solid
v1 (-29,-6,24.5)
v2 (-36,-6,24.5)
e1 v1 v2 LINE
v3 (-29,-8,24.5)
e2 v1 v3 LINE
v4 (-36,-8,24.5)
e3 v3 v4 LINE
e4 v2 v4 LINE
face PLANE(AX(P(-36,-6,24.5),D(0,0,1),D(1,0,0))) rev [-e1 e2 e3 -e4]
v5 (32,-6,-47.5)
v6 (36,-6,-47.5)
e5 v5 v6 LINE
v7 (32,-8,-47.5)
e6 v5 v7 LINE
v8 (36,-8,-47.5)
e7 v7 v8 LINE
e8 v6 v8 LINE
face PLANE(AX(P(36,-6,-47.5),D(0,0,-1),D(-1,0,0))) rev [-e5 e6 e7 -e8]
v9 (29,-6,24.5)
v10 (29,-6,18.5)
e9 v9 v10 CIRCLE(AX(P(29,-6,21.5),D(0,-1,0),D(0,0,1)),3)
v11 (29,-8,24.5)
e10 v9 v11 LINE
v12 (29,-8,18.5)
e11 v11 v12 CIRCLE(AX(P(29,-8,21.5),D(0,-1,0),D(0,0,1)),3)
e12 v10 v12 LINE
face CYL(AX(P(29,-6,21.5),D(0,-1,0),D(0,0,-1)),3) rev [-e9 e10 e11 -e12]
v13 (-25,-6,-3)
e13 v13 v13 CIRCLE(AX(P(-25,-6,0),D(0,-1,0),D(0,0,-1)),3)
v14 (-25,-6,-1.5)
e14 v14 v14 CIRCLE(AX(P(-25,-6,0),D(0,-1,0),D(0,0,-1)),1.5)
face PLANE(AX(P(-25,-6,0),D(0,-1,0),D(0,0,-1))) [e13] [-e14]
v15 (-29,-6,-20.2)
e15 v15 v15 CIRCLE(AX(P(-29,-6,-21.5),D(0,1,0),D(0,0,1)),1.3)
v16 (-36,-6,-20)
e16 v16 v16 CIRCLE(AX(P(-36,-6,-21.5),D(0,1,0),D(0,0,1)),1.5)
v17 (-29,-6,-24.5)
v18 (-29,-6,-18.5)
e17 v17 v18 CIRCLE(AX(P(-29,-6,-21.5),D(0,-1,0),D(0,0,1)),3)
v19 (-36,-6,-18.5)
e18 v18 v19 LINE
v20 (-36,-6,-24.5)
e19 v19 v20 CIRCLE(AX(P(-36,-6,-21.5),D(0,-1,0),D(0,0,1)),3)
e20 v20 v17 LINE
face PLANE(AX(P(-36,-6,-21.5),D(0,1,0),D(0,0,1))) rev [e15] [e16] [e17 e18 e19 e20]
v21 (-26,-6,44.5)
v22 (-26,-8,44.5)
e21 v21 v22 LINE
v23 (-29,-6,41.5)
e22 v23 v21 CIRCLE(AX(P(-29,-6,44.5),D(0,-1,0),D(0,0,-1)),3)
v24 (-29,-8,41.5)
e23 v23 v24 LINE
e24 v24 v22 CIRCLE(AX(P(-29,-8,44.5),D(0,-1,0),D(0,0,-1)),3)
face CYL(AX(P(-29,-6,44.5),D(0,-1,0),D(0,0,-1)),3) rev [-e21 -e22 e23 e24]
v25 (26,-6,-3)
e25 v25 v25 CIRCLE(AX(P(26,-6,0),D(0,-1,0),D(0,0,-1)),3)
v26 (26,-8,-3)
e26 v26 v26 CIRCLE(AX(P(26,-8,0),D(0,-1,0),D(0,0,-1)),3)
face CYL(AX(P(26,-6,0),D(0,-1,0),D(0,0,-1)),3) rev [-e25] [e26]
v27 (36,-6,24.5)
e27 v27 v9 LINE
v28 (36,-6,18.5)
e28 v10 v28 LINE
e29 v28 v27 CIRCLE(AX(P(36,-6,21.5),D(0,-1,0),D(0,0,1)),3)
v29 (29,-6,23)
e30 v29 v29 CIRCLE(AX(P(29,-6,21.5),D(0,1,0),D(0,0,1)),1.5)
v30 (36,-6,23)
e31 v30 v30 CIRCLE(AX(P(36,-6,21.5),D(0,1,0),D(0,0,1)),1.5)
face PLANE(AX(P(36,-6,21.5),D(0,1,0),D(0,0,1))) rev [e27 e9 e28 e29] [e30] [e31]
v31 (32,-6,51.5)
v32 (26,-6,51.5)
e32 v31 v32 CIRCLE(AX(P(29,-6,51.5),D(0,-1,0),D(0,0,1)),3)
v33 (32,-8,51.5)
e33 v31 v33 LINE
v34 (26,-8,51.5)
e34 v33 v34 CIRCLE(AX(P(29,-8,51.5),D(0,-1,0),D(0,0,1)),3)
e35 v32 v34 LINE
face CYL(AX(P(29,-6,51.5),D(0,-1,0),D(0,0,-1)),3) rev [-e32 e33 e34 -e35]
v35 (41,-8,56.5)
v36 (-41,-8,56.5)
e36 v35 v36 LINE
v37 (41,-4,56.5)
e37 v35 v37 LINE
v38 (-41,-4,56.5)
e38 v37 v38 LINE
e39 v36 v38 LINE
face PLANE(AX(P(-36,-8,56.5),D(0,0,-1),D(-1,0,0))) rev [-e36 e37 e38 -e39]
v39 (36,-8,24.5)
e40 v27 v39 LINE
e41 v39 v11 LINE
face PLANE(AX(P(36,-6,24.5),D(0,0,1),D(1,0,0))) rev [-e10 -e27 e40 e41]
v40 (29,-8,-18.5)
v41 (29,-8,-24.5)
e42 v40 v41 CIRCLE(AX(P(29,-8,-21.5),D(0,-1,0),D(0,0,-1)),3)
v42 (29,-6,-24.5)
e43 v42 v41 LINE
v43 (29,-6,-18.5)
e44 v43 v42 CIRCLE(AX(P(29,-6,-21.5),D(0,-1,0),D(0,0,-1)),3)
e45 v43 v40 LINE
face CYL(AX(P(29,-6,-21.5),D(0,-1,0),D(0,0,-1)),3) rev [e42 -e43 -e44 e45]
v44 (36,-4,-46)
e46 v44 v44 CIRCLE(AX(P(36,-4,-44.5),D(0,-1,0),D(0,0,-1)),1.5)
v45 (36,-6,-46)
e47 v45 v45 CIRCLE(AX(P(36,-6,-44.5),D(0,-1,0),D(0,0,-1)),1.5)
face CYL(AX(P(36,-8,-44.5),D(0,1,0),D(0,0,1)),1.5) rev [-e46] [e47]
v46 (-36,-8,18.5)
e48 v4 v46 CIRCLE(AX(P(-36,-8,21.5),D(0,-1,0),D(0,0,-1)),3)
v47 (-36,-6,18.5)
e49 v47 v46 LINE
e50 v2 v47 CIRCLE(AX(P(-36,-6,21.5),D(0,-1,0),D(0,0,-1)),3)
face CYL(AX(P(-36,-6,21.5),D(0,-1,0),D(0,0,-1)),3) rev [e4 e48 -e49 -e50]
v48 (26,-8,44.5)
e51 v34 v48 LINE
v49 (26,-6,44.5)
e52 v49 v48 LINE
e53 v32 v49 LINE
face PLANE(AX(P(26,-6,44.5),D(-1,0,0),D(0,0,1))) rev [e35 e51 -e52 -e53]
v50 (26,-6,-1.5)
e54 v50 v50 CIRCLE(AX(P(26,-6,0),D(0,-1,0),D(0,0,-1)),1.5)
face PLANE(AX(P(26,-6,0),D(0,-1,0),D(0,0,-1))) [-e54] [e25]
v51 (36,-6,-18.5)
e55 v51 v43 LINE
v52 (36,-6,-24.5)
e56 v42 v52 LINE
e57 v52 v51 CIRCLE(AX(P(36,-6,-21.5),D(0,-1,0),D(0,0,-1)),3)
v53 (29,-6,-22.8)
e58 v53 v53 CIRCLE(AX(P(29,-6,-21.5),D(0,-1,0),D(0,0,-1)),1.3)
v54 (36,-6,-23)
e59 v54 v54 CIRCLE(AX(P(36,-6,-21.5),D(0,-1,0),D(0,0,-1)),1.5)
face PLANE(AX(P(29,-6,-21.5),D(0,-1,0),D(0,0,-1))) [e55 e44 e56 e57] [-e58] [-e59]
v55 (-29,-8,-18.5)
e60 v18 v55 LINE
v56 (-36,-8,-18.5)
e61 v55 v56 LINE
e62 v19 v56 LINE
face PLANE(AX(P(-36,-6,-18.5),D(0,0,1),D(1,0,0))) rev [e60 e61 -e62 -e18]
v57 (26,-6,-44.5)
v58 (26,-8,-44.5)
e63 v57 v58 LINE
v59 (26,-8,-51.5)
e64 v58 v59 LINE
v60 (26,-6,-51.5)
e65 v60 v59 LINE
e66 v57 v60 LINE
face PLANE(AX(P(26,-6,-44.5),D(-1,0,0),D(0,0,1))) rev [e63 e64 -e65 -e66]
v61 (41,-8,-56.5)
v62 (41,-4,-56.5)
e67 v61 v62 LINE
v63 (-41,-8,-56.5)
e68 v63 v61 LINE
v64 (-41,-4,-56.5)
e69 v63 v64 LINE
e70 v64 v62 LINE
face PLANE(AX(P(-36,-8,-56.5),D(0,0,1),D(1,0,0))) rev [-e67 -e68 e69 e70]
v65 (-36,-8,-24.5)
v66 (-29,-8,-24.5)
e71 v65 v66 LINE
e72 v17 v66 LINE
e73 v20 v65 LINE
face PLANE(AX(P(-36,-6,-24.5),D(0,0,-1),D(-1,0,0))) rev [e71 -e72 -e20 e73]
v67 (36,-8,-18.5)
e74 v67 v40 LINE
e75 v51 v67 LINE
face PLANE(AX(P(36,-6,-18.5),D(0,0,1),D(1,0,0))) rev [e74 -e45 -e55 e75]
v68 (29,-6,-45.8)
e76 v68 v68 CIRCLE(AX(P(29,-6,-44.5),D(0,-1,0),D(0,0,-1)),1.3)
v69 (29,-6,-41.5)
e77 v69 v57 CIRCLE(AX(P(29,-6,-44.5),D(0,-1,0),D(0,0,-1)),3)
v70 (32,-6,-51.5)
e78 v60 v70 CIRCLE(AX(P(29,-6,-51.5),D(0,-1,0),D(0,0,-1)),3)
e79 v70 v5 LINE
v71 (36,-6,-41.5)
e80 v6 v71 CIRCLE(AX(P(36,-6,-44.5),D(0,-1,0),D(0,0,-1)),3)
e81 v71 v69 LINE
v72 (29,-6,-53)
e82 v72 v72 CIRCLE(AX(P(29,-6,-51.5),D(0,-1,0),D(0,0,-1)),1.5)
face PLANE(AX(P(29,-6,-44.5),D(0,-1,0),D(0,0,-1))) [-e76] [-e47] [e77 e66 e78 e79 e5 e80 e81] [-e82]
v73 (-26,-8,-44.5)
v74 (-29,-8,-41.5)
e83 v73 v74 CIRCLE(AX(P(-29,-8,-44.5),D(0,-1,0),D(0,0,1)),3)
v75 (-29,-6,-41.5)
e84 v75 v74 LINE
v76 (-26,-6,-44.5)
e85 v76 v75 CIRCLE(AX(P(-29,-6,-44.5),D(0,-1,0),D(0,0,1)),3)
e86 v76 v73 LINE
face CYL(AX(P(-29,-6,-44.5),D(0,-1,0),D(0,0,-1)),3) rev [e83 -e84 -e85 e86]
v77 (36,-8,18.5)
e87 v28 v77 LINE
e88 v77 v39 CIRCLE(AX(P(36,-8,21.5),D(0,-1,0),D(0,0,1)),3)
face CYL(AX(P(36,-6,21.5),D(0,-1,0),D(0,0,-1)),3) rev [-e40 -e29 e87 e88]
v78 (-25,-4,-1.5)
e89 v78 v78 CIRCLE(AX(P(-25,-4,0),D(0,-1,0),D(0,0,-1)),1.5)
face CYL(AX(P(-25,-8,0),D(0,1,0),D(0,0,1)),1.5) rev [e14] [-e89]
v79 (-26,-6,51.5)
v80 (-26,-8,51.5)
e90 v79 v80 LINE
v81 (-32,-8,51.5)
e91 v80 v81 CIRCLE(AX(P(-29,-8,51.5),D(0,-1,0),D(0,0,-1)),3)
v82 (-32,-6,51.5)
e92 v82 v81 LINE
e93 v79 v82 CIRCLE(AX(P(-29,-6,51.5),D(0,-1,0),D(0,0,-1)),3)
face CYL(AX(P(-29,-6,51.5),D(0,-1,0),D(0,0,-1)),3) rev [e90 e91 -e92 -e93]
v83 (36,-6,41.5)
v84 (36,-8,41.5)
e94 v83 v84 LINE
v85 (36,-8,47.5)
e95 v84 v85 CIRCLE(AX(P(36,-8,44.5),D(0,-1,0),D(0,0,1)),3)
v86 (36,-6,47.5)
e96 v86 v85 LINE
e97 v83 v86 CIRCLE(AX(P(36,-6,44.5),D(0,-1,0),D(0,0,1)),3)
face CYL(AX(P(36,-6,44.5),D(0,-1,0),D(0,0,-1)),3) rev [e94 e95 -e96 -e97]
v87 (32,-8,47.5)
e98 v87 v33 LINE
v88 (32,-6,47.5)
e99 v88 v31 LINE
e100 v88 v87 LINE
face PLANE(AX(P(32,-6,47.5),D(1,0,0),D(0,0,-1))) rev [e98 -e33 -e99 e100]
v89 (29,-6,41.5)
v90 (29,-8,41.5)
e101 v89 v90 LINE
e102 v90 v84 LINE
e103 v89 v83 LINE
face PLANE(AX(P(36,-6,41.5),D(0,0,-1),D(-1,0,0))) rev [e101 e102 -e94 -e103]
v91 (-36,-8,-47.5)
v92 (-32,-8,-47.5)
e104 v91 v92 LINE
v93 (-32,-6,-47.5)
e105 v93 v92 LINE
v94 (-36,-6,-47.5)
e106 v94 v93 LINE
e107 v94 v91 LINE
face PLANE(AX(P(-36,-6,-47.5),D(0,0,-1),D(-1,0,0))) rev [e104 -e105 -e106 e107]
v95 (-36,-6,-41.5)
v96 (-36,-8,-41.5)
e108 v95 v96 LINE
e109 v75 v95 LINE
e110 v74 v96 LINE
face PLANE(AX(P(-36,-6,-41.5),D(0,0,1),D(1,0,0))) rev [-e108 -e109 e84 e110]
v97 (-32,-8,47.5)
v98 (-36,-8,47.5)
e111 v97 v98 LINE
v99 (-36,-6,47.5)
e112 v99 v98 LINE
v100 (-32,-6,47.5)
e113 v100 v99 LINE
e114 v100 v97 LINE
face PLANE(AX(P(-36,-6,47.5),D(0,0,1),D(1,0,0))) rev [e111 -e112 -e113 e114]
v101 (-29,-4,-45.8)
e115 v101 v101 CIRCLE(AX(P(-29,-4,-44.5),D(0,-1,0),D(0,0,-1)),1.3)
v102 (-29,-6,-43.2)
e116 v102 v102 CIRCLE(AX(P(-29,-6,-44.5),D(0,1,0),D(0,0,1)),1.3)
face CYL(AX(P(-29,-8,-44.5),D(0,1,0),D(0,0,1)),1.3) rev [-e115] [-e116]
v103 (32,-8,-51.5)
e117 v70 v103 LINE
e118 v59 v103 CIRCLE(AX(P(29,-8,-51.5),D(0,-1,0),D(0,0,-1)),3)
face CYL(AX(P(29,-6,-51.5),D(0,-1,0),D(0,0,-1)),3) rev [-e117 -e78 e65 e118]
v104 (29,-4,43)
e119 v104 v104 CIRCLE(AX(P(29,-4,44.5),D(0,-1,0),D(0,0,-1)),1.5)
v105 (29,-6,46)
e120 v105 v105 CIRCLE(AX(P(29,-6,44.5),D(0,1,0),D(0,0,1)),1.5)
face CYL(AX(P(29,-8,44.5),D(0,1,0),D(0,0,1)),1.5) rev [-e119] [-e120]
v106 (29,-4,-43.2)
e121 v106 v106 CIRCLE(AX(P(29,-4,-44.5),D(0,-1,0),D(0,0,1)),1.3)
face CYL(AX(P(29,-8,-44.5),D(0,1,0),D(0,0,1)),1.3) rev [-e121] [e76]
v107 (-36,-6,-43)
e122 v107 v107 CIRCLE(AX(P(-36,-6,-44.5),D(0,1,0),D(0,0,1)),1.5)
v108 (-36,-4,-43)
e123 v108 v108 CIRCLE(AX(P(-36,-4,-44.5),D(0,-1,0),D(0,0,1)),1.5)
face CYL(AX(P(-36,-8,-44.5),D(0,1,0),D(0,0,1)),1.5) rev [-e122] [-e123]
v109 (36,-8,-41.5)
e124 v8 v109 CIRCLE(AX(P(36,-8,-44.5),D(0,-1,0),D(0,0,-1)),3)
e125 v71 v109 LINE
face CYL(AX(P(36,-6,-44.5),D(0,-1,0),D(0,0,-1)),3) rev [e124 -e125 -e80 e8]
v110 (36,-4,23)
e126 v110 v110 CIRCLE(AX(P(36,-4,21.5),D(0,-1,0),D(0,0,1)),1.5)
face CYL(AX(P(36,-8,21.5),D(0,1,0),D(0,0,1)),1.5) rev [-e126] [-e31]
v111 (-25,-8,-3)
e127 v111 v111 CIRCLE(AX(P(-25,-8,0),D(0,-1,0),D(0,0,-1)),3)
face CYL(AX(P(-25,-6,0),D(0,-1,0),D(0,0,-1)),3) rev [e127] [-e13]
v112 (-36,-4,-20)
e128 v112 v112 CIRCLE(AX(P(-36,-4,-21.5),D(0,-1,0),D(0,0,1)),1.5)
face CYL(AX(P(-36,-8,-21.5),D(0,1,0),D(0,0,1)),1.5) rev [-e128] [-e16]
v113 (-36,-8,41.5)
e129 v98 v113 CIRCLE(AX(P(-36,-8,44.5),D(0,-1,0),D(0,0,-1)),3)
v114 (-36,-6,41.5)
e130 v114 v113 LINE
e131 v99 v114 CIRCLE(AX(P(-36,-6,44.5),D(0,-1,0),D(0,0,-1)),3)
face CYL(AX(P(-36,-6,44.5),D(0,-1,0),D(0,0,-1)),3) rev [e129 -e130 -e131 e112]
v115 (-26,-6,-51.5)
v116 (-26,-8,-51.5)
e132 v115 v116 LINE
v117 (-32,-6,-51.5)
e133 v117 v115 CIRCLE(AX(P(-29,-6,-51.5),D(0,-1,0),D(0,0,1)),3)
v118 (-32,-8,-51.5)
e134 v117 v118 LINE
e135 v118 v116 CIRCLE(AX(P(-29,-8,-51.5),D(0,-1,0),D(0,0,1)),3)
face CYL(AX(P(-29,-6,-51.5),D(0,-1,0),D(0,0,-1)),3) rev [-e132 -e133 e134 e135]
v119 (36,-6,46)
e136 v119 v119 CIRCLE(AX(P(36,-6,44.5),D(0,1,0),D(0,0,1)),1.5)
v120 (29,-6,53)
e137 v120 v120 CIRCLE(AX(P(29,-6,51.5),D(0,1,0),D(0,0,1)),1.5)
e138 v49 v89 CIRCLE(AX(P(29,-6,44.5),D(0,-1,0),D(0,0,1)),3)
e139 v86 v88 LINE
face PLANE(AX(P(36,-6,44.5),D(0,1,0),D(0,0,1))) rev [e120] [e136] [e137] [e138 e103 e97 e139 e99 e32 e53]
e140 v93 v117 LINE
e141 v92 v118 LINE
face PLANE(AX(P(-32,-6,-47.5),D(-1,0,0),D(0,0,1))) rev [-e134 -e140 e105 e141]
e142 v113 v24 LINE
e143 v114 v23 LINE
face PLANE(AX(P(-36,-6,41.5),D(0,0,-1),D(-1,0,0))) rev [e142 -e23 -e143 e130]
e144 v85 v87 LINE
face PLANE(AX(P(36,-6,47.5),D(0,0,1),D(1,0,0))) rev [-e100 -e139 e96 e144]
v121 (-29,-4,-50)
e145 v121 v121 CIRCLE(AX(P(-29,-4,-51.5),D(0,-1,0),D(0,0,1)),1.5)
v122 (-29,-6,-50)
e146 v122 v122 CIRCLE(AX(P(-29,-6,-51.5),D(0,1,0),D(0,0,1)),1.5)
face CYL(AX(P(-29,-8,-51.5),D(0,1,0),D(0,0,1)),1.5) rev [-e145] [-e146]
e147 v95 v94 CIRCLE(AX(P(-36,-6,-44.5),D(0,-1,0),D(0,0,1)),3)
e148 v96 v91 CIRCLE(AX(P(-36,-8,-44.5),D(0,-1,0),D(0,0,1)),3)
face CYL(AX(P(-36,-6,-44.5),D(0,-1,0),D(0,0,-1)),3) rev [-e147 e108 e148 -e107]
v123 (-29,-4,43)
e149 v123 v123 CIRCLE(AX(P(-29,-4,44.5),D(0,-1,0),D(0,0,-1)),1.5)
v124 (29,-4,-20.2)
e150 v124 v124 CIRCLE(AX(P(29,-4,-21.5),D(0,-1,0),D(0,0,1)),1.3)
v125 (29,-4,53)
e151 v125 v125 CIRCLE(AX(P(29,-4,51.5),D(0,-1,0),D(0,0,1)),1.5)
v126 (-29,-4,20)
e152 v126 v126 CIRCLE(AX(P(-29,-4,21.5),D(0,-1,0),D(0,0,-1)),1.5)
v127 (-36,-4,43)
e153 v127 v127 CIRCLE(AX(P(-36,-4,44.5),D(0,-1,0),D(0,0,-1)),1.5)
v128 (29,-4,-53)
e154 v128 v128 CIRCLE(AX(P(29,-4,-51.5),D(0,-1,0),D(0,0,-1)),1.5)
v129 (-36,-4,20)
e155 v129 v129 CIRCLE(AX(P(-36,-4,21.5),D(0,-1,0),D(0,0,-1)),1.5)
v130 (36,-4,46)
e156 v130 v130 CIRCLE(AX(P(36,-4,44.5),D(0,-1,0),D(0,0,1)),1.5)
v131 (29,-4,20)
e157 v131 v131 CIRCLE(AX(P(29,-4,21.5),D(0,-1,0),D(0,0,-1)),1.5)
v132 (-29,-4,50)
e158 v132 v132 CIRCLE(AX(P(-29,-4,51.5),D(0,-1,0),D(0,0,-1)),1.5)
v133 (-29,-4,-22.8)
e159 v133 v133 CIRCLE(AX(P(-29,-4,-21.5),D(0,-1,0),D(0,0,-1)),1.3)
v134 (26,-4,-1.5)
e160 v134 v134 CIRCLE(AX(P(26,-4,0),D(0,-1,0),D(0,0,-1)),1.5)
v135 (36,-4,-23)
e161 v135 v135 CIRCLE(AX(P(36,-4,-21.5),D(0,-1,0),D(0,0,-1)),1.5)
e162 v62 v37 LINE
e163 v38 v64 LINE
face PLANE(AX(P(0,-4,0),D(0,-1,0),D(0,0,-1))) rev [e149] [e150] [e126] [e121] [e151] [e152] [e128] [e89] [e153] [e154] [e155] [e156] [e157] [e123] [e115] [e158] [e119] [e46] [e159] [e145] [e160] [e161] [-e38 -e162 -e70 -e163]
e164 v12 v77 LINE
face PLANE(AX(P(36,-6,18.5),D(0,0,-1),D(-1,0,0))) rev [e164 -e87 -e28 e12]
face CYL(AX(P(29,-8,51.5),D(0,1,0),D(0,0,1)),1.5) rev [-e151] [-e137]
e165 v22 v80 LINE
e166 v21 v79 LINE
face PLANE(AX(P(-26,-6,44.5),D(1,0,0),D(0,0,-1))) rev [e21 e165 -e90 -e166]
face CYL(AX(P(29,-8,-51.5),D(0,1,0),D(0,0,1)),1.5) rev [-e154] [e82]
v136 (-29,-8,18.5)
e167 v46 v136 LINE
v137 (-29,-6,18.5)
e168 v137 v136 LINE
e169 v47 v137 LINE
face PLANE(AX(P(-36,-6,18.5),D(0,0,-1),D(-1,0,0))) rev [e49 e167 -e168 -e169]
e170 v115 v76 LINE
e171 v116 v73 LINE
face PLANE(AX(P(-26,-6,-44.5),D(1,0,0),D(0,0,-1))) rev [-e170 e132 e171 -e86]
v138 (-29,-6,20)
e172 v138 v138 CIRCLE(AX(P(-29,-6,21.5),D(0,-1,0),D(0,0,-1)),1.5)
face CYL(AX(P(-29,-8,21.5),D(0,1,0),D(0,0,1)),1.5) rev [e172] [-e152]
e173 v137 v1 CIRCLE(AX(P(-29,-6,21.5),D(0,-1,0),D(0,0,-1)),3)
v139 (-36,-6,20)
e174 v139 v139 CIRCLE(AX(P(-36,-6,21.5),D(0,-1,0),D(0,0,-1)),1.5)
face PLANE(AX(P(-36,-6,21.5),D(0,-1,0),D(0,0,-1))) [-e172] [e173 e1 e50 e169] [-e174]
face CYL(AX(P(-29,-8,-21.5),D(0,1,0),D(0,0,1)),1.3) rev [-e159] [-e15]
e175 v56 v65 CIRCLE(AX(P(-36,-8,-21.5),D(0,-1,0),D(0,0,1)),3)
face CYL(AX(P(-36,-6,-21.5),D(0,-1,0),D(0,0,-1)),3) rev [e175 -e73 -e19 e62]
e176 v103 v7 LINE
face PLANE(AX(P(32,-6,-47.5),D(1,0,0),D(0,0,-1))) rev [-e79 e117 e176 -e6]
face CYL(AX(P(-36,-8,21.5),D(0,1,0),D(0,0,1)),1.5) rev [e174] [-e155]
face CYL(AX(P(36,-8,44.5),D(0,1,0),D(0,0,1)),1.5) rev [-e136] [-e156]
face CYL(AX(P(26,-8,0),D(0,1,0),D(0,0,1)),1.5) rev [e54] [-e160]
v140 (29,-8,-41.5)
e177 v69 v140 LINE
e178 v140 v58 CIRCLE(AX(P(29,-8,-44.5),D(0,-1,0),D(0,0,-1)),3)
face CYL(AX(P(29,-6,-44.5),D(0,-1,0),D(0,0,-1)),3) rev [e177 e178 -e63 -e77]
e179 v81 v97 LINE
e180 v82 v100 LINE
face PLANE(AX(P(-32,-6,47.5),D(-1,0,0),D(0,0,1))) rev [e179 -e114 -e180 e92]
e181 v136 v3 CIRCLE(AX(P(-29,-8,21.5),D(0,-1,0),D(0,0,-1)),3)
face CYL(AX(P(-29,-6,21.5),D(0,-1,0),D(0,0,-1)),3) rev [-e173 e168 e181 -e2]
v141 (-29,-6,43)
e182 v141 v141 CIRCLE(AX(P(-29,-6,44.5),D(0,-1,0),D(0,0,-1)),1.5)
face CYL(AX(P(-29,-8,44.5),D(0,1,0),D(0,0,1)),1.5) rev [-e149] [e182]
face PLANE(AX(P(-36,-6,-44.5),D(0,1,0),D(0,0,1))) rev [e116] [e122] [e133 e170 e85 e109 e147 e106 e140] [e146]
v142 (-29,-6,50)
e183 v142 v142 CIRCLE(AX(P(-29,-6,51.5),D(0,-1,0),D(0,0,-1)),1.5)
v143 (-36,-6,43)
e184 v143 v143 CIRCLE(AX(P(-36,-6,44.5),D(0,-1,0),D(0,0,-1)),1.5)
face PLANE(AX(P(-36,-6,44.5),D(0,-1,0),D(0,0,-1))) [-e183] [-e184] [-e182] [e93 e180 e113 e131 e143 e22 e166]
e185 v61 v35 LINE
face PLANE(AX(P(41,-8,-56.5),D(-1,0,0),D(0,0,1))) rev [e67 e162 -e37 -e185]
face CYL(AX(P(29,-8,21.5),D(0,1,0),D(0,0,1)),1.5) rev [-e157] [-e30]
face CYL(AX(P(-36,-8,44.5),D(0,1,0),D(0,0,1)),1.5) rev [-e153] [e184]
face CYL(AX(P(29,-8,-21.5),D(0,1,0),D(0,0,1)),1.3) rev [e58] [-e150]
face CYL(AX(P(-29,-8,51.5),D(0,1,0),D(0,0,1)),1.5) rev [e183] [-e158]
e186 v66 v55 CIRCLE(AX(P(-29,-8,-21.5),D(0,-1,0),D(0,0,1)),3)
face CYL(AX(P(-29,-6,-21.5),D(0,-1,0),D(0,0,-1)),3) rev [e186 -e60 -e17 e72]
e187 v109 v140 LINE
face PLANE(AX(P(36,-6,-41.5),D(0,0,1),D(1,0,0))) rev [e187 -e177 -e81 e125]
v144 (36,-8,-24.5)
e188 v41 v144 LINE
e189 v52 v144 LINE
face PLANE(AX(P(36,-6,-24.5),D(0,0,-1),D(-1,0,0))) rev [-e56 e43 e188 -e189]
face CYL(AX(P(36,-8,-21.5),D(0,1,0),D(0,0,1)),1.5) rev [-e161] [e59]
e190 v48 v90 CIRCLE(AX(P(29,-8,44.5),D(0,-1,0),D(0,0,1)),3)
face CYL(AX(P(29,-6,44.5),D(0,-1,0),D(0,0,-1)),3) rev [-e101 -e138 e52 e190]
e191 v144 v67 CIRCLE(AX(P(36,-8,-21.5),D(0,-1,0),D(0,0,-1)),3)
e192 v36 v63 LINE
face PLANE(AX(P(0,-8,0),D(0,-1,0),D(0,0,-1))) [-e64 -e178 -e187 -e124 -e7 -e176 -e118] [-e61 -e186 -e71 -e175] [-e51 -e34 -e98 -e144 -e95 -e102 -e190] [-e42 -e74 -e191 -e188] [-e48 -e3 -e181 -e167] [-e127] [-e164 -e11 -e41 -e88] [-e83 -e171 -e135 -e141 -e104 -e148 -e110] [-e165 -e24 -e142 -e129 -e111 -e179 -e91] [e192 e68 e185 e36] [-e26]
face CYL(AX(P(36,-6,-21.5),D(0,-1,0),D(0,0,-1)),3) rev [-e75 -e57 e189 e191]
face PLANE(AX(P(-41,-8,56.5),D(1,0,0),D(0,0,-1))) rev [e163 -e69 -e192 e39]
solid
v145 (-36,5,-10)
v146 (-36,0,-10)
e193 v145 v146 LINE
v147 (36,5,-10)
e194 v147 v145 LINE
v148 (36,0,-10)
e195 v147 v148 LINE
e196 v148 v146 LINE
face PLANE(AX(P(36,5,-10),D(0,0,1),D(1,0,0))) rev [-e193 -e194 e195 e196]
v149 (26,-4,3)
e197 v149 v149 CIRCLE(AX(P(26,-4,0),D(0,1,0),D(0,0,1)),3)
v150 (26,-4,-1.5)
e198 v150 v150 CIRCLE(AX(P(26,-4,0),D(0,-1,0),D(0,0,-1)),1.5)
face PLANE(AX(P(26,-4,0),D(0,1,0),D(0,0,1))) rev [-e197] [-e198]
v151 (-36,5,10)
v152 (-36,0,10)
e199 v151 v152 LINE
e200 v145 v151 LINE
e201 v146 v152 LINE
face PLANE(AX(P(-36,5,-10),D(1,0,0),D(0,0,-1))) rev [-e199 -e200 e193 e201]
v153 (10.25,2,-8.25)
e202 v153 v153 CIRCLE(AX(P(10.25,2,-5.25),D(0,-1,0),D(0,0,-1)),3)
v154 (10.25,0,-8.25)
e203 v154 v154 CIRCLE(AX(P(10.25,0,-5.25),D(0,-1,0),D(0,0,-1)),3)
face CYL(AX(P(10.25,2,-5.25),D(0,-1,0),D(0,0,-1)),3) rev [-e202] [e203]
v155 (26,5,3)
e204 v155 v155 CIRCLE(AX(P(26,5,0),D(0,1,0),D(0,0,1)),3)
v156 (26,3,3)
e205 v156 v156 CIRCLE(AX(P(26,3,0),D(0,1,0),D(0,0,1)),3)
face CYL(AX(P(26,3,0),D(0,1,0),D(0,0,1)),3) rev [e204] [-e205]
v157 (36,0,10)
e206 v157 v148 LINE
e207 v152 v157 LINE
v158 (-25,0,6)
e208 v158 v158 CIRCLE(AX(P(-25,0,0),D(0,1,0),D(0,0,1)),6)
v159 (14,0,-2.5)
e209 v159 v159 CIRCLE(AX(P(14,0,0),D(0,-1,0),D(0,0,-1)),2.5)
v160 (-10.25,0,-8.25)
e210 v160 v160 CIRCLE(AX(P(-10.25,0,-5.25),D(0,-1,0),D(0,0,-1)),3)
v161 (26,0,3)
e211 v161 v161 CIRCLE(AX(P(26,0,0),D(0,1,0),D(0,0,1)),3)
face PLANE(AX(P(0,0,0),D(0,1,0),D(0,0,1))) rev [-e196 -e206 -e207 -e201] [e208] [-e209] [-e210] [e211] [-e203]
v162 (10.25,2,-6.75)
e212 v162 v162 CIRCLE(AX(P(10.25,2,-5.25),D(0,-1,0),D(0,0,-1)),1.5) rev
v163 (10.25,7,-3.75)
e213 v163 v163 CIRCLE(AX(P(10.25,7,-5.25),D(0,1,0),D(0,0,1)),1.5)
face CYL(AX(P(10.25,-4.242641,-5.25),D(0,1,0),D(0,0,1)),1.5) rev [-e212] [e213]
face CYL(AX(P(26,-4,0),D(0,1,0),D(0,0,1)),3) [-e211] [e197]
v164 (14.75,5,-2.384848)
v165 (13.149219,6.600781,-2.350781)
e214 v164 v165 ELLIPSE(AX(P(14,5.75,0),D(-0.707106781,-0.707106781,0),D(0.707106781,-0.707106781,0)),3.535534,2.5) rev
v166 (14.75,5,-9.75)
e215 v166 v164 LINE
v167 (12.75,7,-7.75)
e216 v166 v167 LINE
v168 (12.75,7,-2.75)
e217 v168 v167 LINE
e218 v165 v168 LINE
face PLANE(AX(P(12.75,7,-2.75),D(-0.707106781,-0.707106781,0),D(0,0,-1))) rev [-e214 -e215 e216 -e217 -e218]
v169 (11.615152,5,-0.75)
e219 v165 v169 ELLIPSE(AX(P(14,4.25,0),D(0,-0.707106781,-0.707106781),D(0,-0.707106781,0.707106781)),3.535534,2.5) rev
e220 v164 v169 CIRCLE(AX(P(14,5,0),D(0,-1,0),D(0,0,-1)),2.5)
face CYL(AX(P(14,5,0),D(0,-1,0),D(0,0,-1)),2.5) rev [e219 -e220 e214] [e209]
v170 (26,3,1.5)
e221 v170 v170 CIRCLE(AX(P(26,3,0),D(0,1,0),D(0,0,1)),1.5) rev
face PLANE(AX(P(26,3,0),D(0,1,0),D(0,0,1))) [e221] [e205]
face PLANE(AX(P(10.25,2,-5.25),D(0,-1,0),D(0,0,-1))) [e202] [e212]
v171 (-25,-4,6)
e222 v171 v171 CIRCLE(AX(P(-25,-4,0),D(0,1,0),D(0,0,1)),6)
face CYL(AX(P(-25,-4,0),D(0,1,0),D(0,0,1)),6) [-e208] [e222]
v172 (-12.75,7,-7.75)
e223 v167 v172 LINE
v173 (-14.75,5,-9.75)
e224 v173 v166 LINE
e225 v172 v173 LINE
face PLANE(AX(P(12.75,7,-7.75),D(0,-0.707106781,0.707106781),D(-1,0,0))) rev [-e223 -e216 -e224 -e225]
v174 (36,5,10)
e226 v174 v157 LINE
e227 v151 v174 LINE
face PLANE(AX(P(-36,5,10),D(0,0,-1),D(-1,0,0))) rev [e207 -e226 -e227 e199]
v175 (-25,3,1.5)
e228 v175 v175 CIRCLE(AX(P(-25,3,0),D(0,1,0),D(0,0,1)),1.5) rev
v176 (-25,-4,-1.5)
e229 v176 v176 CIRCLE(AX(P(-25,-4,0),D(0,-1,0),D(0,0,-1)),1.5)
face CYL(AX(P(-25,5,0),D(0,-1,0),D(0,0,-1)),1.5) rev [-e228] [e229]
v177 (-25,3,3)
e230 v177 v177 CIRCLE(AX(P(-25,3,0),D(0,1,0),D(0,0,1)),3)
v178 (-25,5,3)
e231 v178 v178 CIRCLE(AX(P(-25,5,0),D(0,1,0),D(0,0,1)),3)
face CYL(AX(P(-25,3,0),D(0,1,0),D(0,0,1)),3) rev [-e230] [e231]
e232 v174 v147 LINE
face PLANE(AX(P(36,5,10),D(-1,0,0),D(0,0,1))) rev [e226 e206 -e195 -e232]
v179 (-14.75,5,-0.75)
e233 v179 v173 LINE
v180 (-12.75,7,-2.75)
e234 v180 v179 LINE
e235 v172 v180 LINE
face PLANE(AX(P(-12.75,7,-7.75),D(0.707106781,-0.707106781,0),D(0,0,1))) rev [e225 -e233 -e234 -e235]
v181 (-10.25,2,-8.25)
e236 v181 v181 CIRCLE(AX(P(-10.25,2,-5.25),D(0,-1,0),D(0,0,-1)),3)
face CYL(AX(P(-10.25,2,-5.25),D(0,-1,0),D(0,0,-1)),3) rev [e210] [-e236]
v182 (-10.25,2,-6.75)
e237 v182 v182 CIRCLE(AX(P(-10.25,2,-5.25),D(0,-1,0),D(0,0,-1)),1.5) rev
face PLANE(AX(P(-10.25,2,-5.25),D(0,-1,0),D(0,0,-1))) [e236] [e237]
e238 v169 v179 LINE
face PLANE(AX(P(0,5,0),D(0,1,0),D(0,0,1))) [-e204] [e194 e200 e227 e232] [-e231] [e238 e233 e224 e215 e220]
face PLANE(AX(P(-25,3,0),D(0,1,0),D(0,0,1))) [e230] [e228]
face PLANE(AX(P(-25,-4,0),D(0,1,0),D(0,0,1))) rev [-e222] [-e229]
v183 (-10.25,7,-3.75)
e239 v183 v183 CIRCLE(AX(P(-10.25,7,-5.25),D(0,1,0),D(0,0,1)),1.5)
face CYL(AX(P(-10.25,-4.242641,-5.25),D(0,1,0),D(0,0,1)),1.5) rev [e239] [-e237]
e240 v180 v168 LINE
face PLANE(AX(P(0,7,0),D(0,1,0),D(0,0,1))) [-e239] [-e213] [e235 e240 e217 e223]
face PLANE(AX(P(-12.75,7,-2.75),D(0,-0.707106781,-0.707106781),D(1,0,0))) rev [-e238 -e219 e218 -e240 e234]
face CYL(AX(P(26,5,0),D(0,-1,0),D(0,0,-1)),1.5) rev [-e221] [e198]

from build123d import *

# Parameters (mm, degrees)
SKETCH2_W           = 72
SKETCH2_H           = 20
BOSS_EXTRUDE1_DEPTH = 5
SKETCH1_R           = 6
SKETCH1_R_2         = 3
BOSS_EXTRUDE2_DEPTH = 4
SKETCH3_R           = 1.5
CUT_EXTRUDE1_DEPTH  = 39.431757701
SKETCH4_R           = 3
CUT_EXTRUDE2_DEPTH  = 2
SKETCH6_R           = 1.3
SKETCH6_R_2         = 1.5
BOSS_EXTRUDE4_DEPTH = 4
SKETCH8_R           = 2.5
CUT_EXTRUDE3_DEPTH  = 71.26556767
SKETCH10_R          = 1.5
CUT_EXTRUDE4_DEPTH  = 5
BOSS_EXTRUDE6_START = 2
SKETCH11_W          = 25.5
SKETCH11_H          = 5
SKETCH11_R          = 1.5
BOSS_EXTRUDE6_DEPTH = 2
SKETCH12_R          = 3
CUT_EXTRUDE5_DEPTH  = 2
CUT_EXTRUDE6_START  = -2
SKETCH14_R          = 3
CUT_EXTRUDE6_DEPTH  = 2


with BuildPart() as part:
    # Sketch2 → Boss-Extrude1 (new body)
    with BuildSketch(Plane(origin=(0, 0, 0), x_dir=(1, 0, 0), z_dir=(0, 1, 0))):
        Rectangle(SKETCH2_W, SKETCH2_H)
    extrude(amount=BOSS_EXTRUDE1_DEPTH)

    # Sketch1 → Boss-Extrude2 (add)
    with BuildSketch(Plane(origin=(0, 0, 0), x_dir=(1, 0, 0), z_dir=(0, 1, 0))):
        with Locations(Location((-25, 0, 0), (0, 0, 270))):
            Circle(SKETCH1_R)
        with Locations(Location((26, 0, 0), (0, 0, 270))):
            Circle(SKETCH1_R_2)
    extrude(amount=-BOSS_EXTRUDE2_DEPTH)

    # Sketch3 → Cut-Extrude1 (cut, through all)
    with BuildSketch(Plane.XZ.offset(4)):
        with Locations(Location((-25, 0, 0), (0, 0, 270))):
            Circle(SKETCH3_R)
        with Locations(Location((26, 0, 0), (0, 0, 270))):
            Circle(SKETCH3_R)
    extrude(amount=-CUT_EXTRUDE1_DEPTH, mode=Mode.SUBTRACT)

    # Sketch4 → Cut-Extrude2 (cut)
    with BuildSketch(Plane(origin=(0, 5, 0), x_dir=(1, 0, 0), z_dir=(0, 1, 0))):
        with Locations(Location((-25, 0, 0), (0, 0, 270))):
            Circle(SKETCH4_R)
        with Locations(Location((26, 0, 0), (0, 0, 270))):
            Circle(SKETCH4_R)
    extrude(amount=-CUT_EXTRUDE2_DEPTH, mode=Mode.SUBTRACT)

    # Sketch8 → Cut-Extrude3 (cut, through all)
    with BuildSketch(Plane.XZ):
        with Locations(Location((14, 0, 0), (0, 0, 270))):
            Circle(SKETCH8_R)
    extrude(amount=-CUT_EXTRUDE3_DEPTH, mode=Mode.SUBTRACT)

    # Sketch10 → Cut-Extrude4 (cut)
    with BuildSketch(Plane(origin=(0, 5, 0), x_dir=(1, 0, 0), z_dir=(0, 1, 0))):
        with Locations(Location((-10.25, 5.25, 0), (0, 0, 270))):
            Circle(SKETCH10_R)
        with Locations(Location((10.25, 5.25, 0), (0, 0, 270))):
            Circle(SKETCH10_R)
    extrude(amount=-CUT_EXTRUDE4_DEPTH, mode=Mode.SUBTRACT)

    # Sketch11 → Boss-Extrude6 (add)
    with BuildSketch(Plane(origin=(0, 5, 0), x_dir=(1, 0, 0), z_dir=(0, 1, 0)).offset(BOSS_EXTRUDE6_START)):
        with Locations((0, 5.25)):
            Rectangle(SKETCH11_W, SKETCH11_H)
        with Locations(Location((-10.25, 5.25, 0), (0, 0, 270))):
            Circle(SKETCH11_R, mode=Mode.SUBTRACT)
        with Locations(Location((10.25, 5.25, 0), (0, 0, 270))):
            Circle(SKETCH11_R, mode=Mode.SUBTRACT)
    extrude(amount=-BOSS_EXTRUDE6_DEPTH)

    # Chamfer2
    # the kernel refuses this chamfer: 2 mm, written as the material it adds along each edge
    with BuildSketch(Plane(origin=(-12.75, 5, -2.75), x_dir=(0, -0.027495876610586487, 0.9996219169112968), z_dir=(1, 0, 0))) as chamfer2_piece_1_section:
        with BuildLine():
            Line((2.05734639, 0), (-0.11309431, -2.054235587))
            Line((-0.11309431, -2.054235587), (-0.153079186, -2.053135752))
            ThreePointArc((-0.153079186, -2.053135752), (-0.068258454, -1.026795659), (-0.039984877, 0.001099835))
            Line((-0.039984877, 0.001099835), (0.001099835, 0.039984877))
            ThreePointArc((0.001099835, 0.039984877), (1.028995329, 0.011711299), (2.058446225, 0.039984877))
            Line((2.058446225, 0.039984877), (2.05734639, 0))
        make_face()
    chamfer2_piece_1 = extrude(amount=25.5, mode=Mode.PRIVATE)
    chamfer2_piece_1 = chamfer2_piece_1 - Plane(origin=(14, 5.660762518, 0), x_dir=(0, 0, -1), z_dir=(0, -1, 0)) * Cylinder(2.5, 60, mode=Mode.PRIVATE)
    chamfer2_piece_1 = split(chamfer2_piece_1, bisect_by=Plane(origin=(-0.134065272, 7, -2.095887334), z_dir=(0, -1, 0)), keep=Keep.TOP, mode=Mode.PRIVATE)
    add(chamfer2_piece_1)
    with BuildSketch(Plane(origin=(12.75, 5, -2.75), x_dir=(0.9996219169112968, -0.027495876610586487, 0), z_dir=(0, 0, -1))) as chamfer2_piece_2_section:
        with BuildLine():
            Line((2.05734639, 0), (-0.11309431, -2.054235587))
            Line((-0.11309431, -2.054235587), (-0.153079186, -2.053135752))
            ThreePointArc((-0.153079186, -2.053135752), (-0.068258454, -1.026795659), (-0.039984877, 0.001099835))
            Line((-0.039984877, 0.001099835), (0.001099835, 0.039984877))
            ThreePointArc((0.001099835, 0.039984877), (1.028995329, 0.011711299), (2.058446225, 0.039984877))
            Line((2.058446225, 0.039984877), (2.05734639, 0))
        make_face()
    chamfer2_piece_2 = extrude(amount=5, mode=Mode.PRIVATE)
    chamfer2_piece_2 = split(chamfer2_piece_2, bisect_by=Plane(origin=(13.410808309, 7, -5.25), z_dir=(0, -1, 0)), keep=Keep.TOP, mode=Mode.PRIVATE)
    add(chamfer2_piece_2)
    with BuildSketch(Plane(origin=(12.75, 5, -7.75), x_dir=(0, -0.027495876610586487, -0.9996219169112968), z_dir=(-1, 0, 0))) as chamfer2_piece_3_section:
        with BuildLine():
            Line((2.05734639, 0), (-0.11309431, -2.054235587))
            Line((-0.11309431, -2.054235587), (-0.153079186, -2.053135752))
            ThreePointArc((-0.153079186, -2.053135752), (-0.068258454, -1.026795659), (-0.039984877, 0.001099835))
            Line((-0.039984877, 0.001099835), (0.001099835, 0.039984877))
            ThreePointArc((0.001099835, 0.039984877), (1.028995329, 0.011711299), (2.058446225, 0.039984877))
            Line((2.058446225, 0.039984877), (2.05734639, 0))
        make_face()
    chamfer2_piece_3 = extrude(amount=25.5, mode=Mode.PRIVATE)
    chamfer2_piece_3 = split(chamfer2_piece_3, bisect_by=Plane(origin=(0, 7, -8.410808309), z_dir=(0, -1, 0)), keep=Keep.TOP, mode=Mode.PRIVATE)
    add(chamfer2_piece_3)
    with BuildSketch(Plane(origin=(-12.75, 5, -7.75), x_dir=(-0.9996219169112968, -0.027495876610586487, 0), z_dir=(0, 0, 1))) as chamfer2_piece_4_section:
        with BuildLine():
            Line((2.05734639, 0), (-0.11309431, -2.054235587))
            Line((-0.11309431, -2.054235587), (-0.153079186, -2.053135752))
            ThreePointArc((-0.153079186, -2.053135752), (-0.068258454, -1.026795659), (-0.039984877, 0.001099835))
            Line((-0.039984877, 0.001099835), (0.001099835, 0.039984877))
            ThreePointArc((0.001099835, 0.039984877), (1.028995329, 0.011711299), (2.058446225, 0.039984877))
            Line((2.058446225, 0.039984877), (2.05734639, 0))
        make_face()
    chamfer2_piece_4 = extrude(amount=5, mode=Mode.PRIVATE)
    chamfer2_piece_4 = split(chamfer2_piece_4, bisect_by=Plane(origin=(-13.410808309, 7, -5.25), z_dir=(0, -1, 0)), keep=Keep.TOP, mode=Mode.PRIVATE)
    add(chamfer2_piece_4)
    with BuildSketch(Plane(origin=(-12.75, 5, -7.75), x_dir=(-0.9996219169112968, -0.027495876610586487, 0), z_dir=(0, 0, 1))) as chamfer2_piece_5a_section:
        with BuildLine():
            Line((2.05734639, 0), (-0.11309431, -2.054235587))
            Line((-0.11309431, -2.054235587), (-0.153079186, -2.053135752))
            ThreePointArc((-0.153079186, -2.053135752), (-0.068258454, -1.026795659), (-0.039984877, 0.001099835))
            Line((-0.039984877, 0.001099835), (0.001099835, 0.039984877))
            ThreePointArc((0.001099835, 0.039984877), (1.028995329, 0.011711299), (2.058446225, 0.039984877))
            Line((2.058446225, 0.039984877), (2.05734639, 0))
        make_face()
    chamfer2_piece_5a = extrude(amount=7.05734639, mode=Mode.PRIVATE)
    chamfer2_piece_5a = split(chamfer2_piece_5a, bisect_by=Plane(origin=(-13.410808309, 7, -1.721326805), z_dir=(0, -1, 0)), keep=Keep.TOP, mode=Mode.PRIVATE)
    chamfer2_piece_5a = split(chamfer2_piece_5a, bisect_by=Plane(origin=(-13.410808309, 5.657268668, -2.75), z_dir=(0, 0, 1)), keep=Keep.TOP, mode=Mode.PRIVATE)
    with BuildSketch(Plane(origin=(-14.80734639, 5, -2.75), x_dir=(0, -0.027495876610586487, 0.9996219169112968), z_dir=(1, 0, 0))) as chamfer2_piece_5b_section:
        with BuildLine():
            Line((2.05734639, 0), (-0.11309431, -2.054235587))
            Line((-0.11309431, -2.054235587), (-0.153079186, -2.053135752))
            ThreePointArc((-0.153079186, -2.053135752), (-0.068258454, -1.026795659), (-0.039984877, 0.001099835))
            Line((-0.039984877, 0.001099835), (0.001099835, 0.039984877))
            ThreePointArc((0.001099835, 0.039984877), (1.028995329, 0.011711299), (2.058446225, 0.039984877))
            Line((2.058446225, 0.039984877), (2.05734639, 0))
        make_face()
    chamfer2_piece_5b = extrude(amount=27.55734639, mode=Mode.PRIVATE)
    chamfer2_piece_5b = split(chamfer2_piece_5b, bisect_by=Plane(origin=(-13.778673195, 7, -2.089191691), z_dir=(0, -1, 0)), keep=Keep.TOP, mode=Mode.PRIVATE)
    chamfer2_piece_5b = split(chamfer2_piece_5b, bisect_by=Plane(origin=(-12.75, 5.657268668, -2.089191691), z_dir=(-1, 0, 0)), keep=Keep.TOP, mode=Mode.PRIVATE)
    chamfer2_piece_5 = chamfer2_piece_5a & chamfer2_piece_5b
    add(chamfer2_piece_5)
    with BuildSketch(Plane(origin=(-12.75, 5, -2.75), x_dir=(0, -0.027495876610586487, 0.9996219169112968), z_dir=(1, 0, 0))) as chamfer2_piece_6a_section:
        with BuildLine():
            Line((2.05734639, 0), (-0.11309431, -2.054235587))
            Line((-0.11309431, -2.054235587), (-0.153079186, -2.053135752))
            ThreePointArc((-0.153079186, -2.053135752), (-0.068258454, -1.026795659), (-0.039984877, 0.001099835))
            Line((-0.039984877, 0.001099835), (0.001099835, 0.039984877))
            ThreePointArc((0.001099835, 0.039984877), (1.028995329, 0.011711299), (2.058446225, 0.039984877))
            Line((2.058446225, 0.039984877), (2.05734639, 0))
        make_face()
    chamfer2_piece_6a = extrude(amount=27.55734639, mode=Mode.PRIVATE)
    chamfer2_piece_6a = chamfer2_piece_6a - Plane(origin=(14, 5.933617383, 0), x_dir=(0, 0, -1), z_dir=(0, -1, 0)) * Cylinder(2.5, 64, mode=Mode.PRIVATE)
    chamfer2_piece_6a = split(chamfer2_piece_6a, bisect_by=Plane(origin=(13.702845422, 7, -2.606312664), z_dir=(0, -1, 0)), keep=Keep.TOP, mode=Mode.PRIVATE)
    chamfer2_piece_6a = split(chamfer2_piece_6a, bisect_by=Plane(origin=(12.75, 5.933617383, -2.606312664), z_dir=(1, 0, 0)), keep=Keep.TOP, mode=Mode.PRIVATE)
    with BuildSketch(Plane(origin=(12.75, 5, -0.69265361), x_dir=(0.9996219169112968, -0.027495876610586487, 0), z_dir=(0, 0, -1))) as chamfer2_piece_6b_section:
        with BuildLine():
            Line((2.05734639, 0), (-0.11309431, -2.054235587))
            Line((-0.11309431, -2.054235587), (-0.153079186, -2.053135752))
            ThreePointArc((-0.153079186, -2.053135752), (-0.068258454, -1.026795659), (-0.039984877, 0.001099835))
            Line((-0.039984877, 0.001099835), (0.001099835, 0.039984877))
            ThreePointArc((0.001099835, 0.039984877), (1.028995329, 0.011711299), (2.058446225, 0.039984877))
            Line((2.058446225, 0.039984877), (2.05734639, 0))
        make_face()
    chamfer2_piece_6b = extrude(amount=7.05734639, mode=Mode.PRIVATE)
    chamfer2_piece_6b = chamfer2_piece_6b - Plane(origin=(14, 5.726450415, 0), x_dir=(0, 0, -1), z_dir=(0, -1, 0)) * Cylinder(2.5, 23, mode=Mode.PRIVATE)
    chamfer2_piece_6b = split(chamfer2_piece_6b, bisect_by=Plane(origin=(13.28343187, 7, -2.545767831), z_dir=(0, -1, 0)), keep=Keep.TOP, mode=Mode.PRIVATE)
    chamfer2_piece_6b = split(chamfer2_piece_6b, bisect_by=Plane(origin=(13.28343187, 5.726450415, -2.75), z_dir=(0, 0, 1)), keep=Keep.TOP, mode=Mode.PRIVATE)
    chamfer2_piece_6 = chamfer2_piece_6a & chamfer2_piece_6b
    add(chamfer2_piece_6)
    with BuildSketch(Plane(origin=(12.75, 5, -2.75), x_dir=(0.9996219169112968, -0.027495876610586487, 0), z_dir=(0, 0, -1))) as chamfer2_piece_7a_section:
        with BuildLine():
            Line((2.05734639, 0), (-0.11309431, -2.054235587))
            Line((-0.11309431, -2.054235587), (-0.153079186, -2.053135752))
            ThreePointArc((-0.153079186, -2.053135752), (-0.068258454, -1.026795659), (-0.039984877, 0.001099835))
            Line((-0.039984877, 0.001099835), (0.001099835, 0.039984877))
            ThreePointArc((0.001099835, 0.039984877), (1.028995329, 0.011711299), (2.058446225, 0.039984877))
            Line((2.058446225, 0.039984877), (2.05734639, 0))
        make_face()
    chamfer2_piece_7a = extrude(amount=7.05734639, mode=Mode.PRIVATE)
    chamfer2_piece_7a = split(chamfer2_piece_7a, bisect_by=Plane(origin=(13.410808309, 5.657268668, -7.75), z_dir=(0, 0, -1)), keep=Keep.TOP, mode=Mode.PRIVATE)
    chamfer2_piece_7a = split(chamfer2_piece_7a, bisect_by=Plane(origin=(13.410808309, 7, -8.778673195), z_dir=(0, -1, 0)), keep=Keep.TOP, mode=Mode.PRIVATE)
    with BuildSketch(Plane(origin=(14.80734639, 5, -7.75), x_dir=(0, -0.027495876610586487, -0.9996219169112968), z_dir=(-1, 0, 0))) as chamfer2_piece_7b_section:
        with BuildLine():
            Line((2.05734639, 0), (-0.11309431, -2.054235587))
            Line((-0.11309431, -2.054235587), (-0.153079186, -2.053135752))
            ThreePointArc((-0.153079186, -2.053135752), (-0.068258454, -1.026795659), (-0.039984877, 0.001099835))
            Line((-0.039984877, 0.001099835), (0.001099835, 0.039984877))
            ThreePointArc((0.001099835, 0.039984877), (1.028995329, 0.011711299), (2.058446225, 0.039984877))
            Line((2.058446225, 0.039984877), (2.05734639, 0))
        make_face()
    chamfer2_piece_7b = extrude(amount=27.55734639, mode=Mode.PRIVATE)
    chamfer2_piece_7b = split(chamfer2_piece_7b, bisect_by=Plane(origin=(12.75, 5.657268668, -8.410808309), z_dir=(1, 0, 0)), keep=Keep.TOP, mode=Mode.PRIVATE)
    chamfer2_piece_7b = split(chamfer2_piece_7b, bisect_by=Plane(origin=(13.778673195, 7, -8.410808309), z_dir=(0, -1, 0)), keep=Keep.TOP, mode=Mode.PRIVATE)
    chamfer2_piece_7 = chamfer2_piece_7a & chamfer2_piece_7b
    add(chamfer2_piece_7)
    with BuildSketch(Plane(origin=(-12.75, 5, -9.80734639), x_dir=(-0.9996219169112968, -0.027495876610586487, 0), z_dir=(0, 0, 1))) as chamfer2_piece_8a_section:
        with BuildLine():
            Line((2.05734639, 0), (-0.11309431, -2.054235587))
            Line((-0.11309431, -2.054235587), (-0.153079186, -2.053135752))
            ThreePointArc((-0.153079186, -2.053135752), (-0.068258454, -1.026795659), (-0.039984877, 0.001099835))
            Line((-0.039984877, 0.001099835), (0.001099835, 0.039984877))
            ThreePointArc((0.001099835, 0.039984877), (1.028995329, 0.011711299), (2.058446225, 0.039984877))
            Line((2.058446225, 0.039984877), (2.05734639, 0))
        make_face()
    chamfer2_piece_8a = extrude(amount=7.05734639, mode=Mode.PRIVATE)
    chamfer2_piece_8a = split(chamfer2_piece_8a, bisect_by=Plane(origin=(-13.410808309, 5.657268668, -7.75), z_dir=(0, 0, -1)), keep=Keep.TOP, mode=Mode.PRIVATE)
    chamfer2_piece_8a = split(chamfer2_piece_8a, bisect_by=Plane(origin=(-13.410808309, 7, -8.778673195), z_dir=(0, -1, 0)), keep=Keep.TOP, mode=Mode.PRIVATE)
    with BuildSketch(Plane(origin=(12.75, 5, -7.75), x_dir=(0, -0.027495876610586487, -0.9996219169112968), z_dir=(-1, 0, 0))) as chamfer2_piece_8b_section:
        with BuildLine():
            Line((2.05734639, 0), (-0.11309431, -2.054235587))
            Line((-0.11309431, -2.054235587), (-0.153079186, -2.053135752))
            ThreePointArc((-0.153079186, -2.053135752), (-0.068258454, -1.026795659), (-0.039984877, 0.001099835))
            Line((-0.039984877, 0.001099835), (0.001099835, 0.039984877))
            ThreePointArc((0.001099835, 0.039984877), (1.028995329, 0.011711299), (2.058446225, 0.039984877))
            Line((2.058446225, 0.039984877), (2.05734639, 0))
        make_face()
    chamfer2_piece_8b = extrude(amount=27.55734639, mode=Mode.PRIVATE)
    chamfer2_piece_8b = split(chamfer2_piece_8b, bisect_by=Plane(origin=(-12.75, 5.657268668, -8.410808309), z_dir=(-1, 0, 0)), keep=Keep.TOP, mode=Mode.PRIVATE)
    chamfer2_piece_8b = split(chamfer2_piece_8b, bisect_by=Plane(origin=(-13.778673195, 7, -8.410808309), z_dir=(0, -1, 0)), keep=Keep.TOP, mode=Mode.PRIVATE)
    chamfer2_piece_8 = chamfer2_piece_8a & chamfer2_piece_8b
    add(chamfer2_piece_8)

    # Sketch12 → Cut-Extrude5 (cut)
    with BuildSketch(Plane.XZ):
        with Locations(Location((-10.25, -5.25, 0), (0, 0, 270))):
            Circle(SKETCH12_R)
        with Locations(Location((10.25, -5.25, 0), (0, 0, 270))):
            Circle(SKETCH12_R)
    extrude(amount=-CUT_EXTRUDE5_DEPTH, mode=Mode.SUBTRACT)


with BuildPart() as body_2:
    # Sketch6 → Boss-Extrude4 (new body)
    with BuildSketch(Plane.XZ.offset(4)):
        Polygon((-36, -56.5), (36, -56.5), (41, -56.5), (41, 56.5), (36, 56.5), (-36, 56.5), (-41, 56.5), (-41, -56.5), align=None)
        with Locations(Location((-29, -21.5, 0), (0, 0, 270))):
            Circle(SKETCH6_R, mode=Mode.SUBTRACT)
        with Locations(Location((-29, -44.5, 0), (0, 0, 270))):
            Circle(SKETCH6_R, mode=Mode.SUBTRACT)
        with Locations(Location((29, -44.5, 0), (0, 0, 90))):
            Circle(SKETCH6_R, mode=Mode.SUBTRACT)
        with Locations(Location((29, -21.5, 0), (0, 0, 90))):
            Circle(SKETCH6_R, mode=Mode.SUBTRACT)
        with Locations(Location((-25, 0, 0), (0, 0, 270))):
            Circle(SKETCH6_R_2, mode=Mode.SUBTRACT)
        with Locations(Location((26, 0, 0), (0, 0, 270))):
            Circle(SKETCH6_R_2, mode=Mode.SUBTRACT)
        with Locations(Location((-29, 44.5, 0), (0, 0, 270))):
            Circle(SKETCH6_R_2, mode=Mode.SUBTRACT)
        with Locations(Location((-29, 21.5, 0), (0, 0, 270))):
            Circle(SKETCH6_R_2, mode=Mode.SUBTRACT)
        with Locations(Location((29, 21.5, 0), (0, 0, 270))):
            Circle(SKETCH6_R_2, mode=Mode.SUBTRACT)
        with Locations(Location((29, 44.5, 0), (0, 0, 270))):
            Circle(SKETCH6_R_2, mode=Mode.SUBTRACT)
        with Locations(Location((-29, 51.5, 0), (0, 0, 270))):
            Circle(SKETCH6_R_2, mode=Mode.SUBTRACT)
        with Locations(Location((29, 51.5, 0), (0, 0, 90))):
            Circle(SKETCH6_R_2, mode=Mode.SUBTRACT)
        with Locations(Location((29, -51.5, 0), (0, 0, 270))):
            Circle(SKETCH6_R_2, mode=Mode.SUBTRACT)
        with Locations(Location((-29, -51.5, 0), (0, 0, 90))):
            Circle(SKETCH6_R_2, mode=Mode.SUBTRACT)
        with Locations(Location((-36, 44.5, 0), (0, 0, 270))):
            Circle(SKETCH6_R_2, mode=Mode.SUBTRACT)
        with Locations(Location((-36, 21.5, 0), (0, 0, 270))):
            Circle(SKETCH6_R_2, mode=Mode.SUBTRACT)
        with Locations(Location((36, 44.5, 0), (0, 0, 90))):
            Circle(SKETCH6_R_2, mode=Mode.SUBTRACT)
        with Locations(Location((36, 21.5, 0), (0, 0, 90))):
            Circle(SKETCH6_R_2, mode=Mode.SUBTRACT)
        with Locations(Location((36, -44.5, 0), (0, 0, 270))):
            Circle(SKETCH6_R_2, mode=Mode.SUBTRACT)
        with Locations(Location((36, -21.5, 0), (0, 0, 270))):
            Circle(SKETCH6_R_2, mode=Mode.SUBTRACT)
        with Locations(Location((-36, -21.5, 0), (0, 0, 90))):
            Circle(SKETCH6_R_2, mode=Mode.SUBTRACT)
        with Locations(Location((-36, -44.5, 0), (0, 0, 90))):
            Circle(SKETCH6_R_2, mode=Mode.SUBTRACT)
    extrude(amount=BOSS_EXTRUDE4_DEPTH)

    # Sketch14 → Cut-Extrude6 (cut)
    with BuildSketch(Plane.XZ.offset(8).offset(CUT_EXTRUDE6_START)):
        with Locations(Location((-25, 0, 0), (0, 0, 270))):
            Circle(SKETCH14_R)
        with Locations(Location((26, 0, 0), (0, 0, 270))):
            Circle(SKETCH14_R)
        with BuildLine():
            Line((-36, 47.5), (-32, 47.5))
            Line((-32, 47.5), (-32, 51.5))
            ThreePointArc((-32, 51.5), (-29, 54.5), (-26, 51.5))
            Line((-26, 51.5), (-26, 44.5))
            ThreePointArc((-26, 44.5), (-26.878679656, 42.378679656), (-29, 41.5))
            Line((-29, 41.5), (-36, 41.5))
            ThreePointArc((-36, 41.5), (-39, 44.5), (-36, 47.5))
        make_face()
        with BuildLine():
            Line((-36, 24.5), (-29, 24.5))
            ThreePointArc((-29, 24.5), (-26, 21.5), (-29, 18.5))
            Line((-29, 18.5), (-36, 18.5))
            ThreePointArc((-36, 18.5), (-39, 21.5), (-36, 24.5))
        make_face()
        with BuildLine():
            Line((36, 18.5), (29, 18.5))
            ThreePointArc((29, 18.5), (26, 21.5), (29, 24.5))
            Line((29, 24.5), (36, 24.5))
            ThreePointArc((36, 24.5), (39, 21.5), (36, 18.5))
        make_face()
        with BuildLine():
            Line((26, 44.5), (26, 51.5))
            ThreePointArc((26, 51.5), (29, 54.5), (32, 51.5))
            Line((32, 51.5), (32, 47.5))
            Line((32, 47.5), (36, 47.5))
            ThreePointArc((36, 47.5), (39, 44.5), (36, 41.5))
            Line((36, 41.5), (29, 41.5))
            ThreePointArc((29, 41.5), (26.878679656, 42.378679656), (26, 44.5))
        make_face()
        with BuildLine():
            Line((36, -47.5), (32, -47.5))
            Line((32, -47.5), (32, -51.5))
            ThreePointArc((32, -51.5), (29, -54.5), (26, -51.5))
            Line((26, -51.5), (26, -44.5))
            ThreePointArc((26, -44.5), (26.878679656, -42.378679656), (29, -41.5))
            Line((29, -41.5), (36, -41.5))
            ThreePointArc((36, -41.5), (39, -44.5), (36, -47.5))
        make_face()
        with BuildLine():
            Line((36, -24.5), (29, -24.5))
            ThreePointArc((29, -24.5), (26, -21.5), (29, -18.5))
            Line((29, -18.5), (36, -18.5))
            ThreePointArc((36, -18.5), (39, -21.5), (36, -24.5))
        make_face()
        with BuildLine():
            Line((-36, -18.5), (-29, -18.5))
            ThreePointArc((-29, -18.5), (-26, -21.5), (-29, -24.5))
            Line((-29, -24.5), (-36, -24.5))
            ThreePointArc((-36, -24.5), (-39, -21.5), (-36, -18.5))
        make_face()
        with BuildLine():
            Line((-26, -44.5), (-26, -51.5))
            ThreePointArc((-26, -51.5), (-29, -54.5), (-32, -51.5))
            Line((-32, -51.5), (-32, -47.5))
            Line((-32, -47.5), (-36, -47.5))
            ThreePointArc((-36, -47.5), (-39, -44.5), (-36, -41.5))
            Line((-36, -41.5), (-29, -41.5))
            ThreePointArc((-29, -41.5), (-26.878679656, -42.378679656), (-26, -44.5))
        make_face()
    extrude(amount=CUT_EXTRUDE6_DEPTH, mode=Mode.SUBTRACT)


solid = Compound([part.part, body_2.part])
